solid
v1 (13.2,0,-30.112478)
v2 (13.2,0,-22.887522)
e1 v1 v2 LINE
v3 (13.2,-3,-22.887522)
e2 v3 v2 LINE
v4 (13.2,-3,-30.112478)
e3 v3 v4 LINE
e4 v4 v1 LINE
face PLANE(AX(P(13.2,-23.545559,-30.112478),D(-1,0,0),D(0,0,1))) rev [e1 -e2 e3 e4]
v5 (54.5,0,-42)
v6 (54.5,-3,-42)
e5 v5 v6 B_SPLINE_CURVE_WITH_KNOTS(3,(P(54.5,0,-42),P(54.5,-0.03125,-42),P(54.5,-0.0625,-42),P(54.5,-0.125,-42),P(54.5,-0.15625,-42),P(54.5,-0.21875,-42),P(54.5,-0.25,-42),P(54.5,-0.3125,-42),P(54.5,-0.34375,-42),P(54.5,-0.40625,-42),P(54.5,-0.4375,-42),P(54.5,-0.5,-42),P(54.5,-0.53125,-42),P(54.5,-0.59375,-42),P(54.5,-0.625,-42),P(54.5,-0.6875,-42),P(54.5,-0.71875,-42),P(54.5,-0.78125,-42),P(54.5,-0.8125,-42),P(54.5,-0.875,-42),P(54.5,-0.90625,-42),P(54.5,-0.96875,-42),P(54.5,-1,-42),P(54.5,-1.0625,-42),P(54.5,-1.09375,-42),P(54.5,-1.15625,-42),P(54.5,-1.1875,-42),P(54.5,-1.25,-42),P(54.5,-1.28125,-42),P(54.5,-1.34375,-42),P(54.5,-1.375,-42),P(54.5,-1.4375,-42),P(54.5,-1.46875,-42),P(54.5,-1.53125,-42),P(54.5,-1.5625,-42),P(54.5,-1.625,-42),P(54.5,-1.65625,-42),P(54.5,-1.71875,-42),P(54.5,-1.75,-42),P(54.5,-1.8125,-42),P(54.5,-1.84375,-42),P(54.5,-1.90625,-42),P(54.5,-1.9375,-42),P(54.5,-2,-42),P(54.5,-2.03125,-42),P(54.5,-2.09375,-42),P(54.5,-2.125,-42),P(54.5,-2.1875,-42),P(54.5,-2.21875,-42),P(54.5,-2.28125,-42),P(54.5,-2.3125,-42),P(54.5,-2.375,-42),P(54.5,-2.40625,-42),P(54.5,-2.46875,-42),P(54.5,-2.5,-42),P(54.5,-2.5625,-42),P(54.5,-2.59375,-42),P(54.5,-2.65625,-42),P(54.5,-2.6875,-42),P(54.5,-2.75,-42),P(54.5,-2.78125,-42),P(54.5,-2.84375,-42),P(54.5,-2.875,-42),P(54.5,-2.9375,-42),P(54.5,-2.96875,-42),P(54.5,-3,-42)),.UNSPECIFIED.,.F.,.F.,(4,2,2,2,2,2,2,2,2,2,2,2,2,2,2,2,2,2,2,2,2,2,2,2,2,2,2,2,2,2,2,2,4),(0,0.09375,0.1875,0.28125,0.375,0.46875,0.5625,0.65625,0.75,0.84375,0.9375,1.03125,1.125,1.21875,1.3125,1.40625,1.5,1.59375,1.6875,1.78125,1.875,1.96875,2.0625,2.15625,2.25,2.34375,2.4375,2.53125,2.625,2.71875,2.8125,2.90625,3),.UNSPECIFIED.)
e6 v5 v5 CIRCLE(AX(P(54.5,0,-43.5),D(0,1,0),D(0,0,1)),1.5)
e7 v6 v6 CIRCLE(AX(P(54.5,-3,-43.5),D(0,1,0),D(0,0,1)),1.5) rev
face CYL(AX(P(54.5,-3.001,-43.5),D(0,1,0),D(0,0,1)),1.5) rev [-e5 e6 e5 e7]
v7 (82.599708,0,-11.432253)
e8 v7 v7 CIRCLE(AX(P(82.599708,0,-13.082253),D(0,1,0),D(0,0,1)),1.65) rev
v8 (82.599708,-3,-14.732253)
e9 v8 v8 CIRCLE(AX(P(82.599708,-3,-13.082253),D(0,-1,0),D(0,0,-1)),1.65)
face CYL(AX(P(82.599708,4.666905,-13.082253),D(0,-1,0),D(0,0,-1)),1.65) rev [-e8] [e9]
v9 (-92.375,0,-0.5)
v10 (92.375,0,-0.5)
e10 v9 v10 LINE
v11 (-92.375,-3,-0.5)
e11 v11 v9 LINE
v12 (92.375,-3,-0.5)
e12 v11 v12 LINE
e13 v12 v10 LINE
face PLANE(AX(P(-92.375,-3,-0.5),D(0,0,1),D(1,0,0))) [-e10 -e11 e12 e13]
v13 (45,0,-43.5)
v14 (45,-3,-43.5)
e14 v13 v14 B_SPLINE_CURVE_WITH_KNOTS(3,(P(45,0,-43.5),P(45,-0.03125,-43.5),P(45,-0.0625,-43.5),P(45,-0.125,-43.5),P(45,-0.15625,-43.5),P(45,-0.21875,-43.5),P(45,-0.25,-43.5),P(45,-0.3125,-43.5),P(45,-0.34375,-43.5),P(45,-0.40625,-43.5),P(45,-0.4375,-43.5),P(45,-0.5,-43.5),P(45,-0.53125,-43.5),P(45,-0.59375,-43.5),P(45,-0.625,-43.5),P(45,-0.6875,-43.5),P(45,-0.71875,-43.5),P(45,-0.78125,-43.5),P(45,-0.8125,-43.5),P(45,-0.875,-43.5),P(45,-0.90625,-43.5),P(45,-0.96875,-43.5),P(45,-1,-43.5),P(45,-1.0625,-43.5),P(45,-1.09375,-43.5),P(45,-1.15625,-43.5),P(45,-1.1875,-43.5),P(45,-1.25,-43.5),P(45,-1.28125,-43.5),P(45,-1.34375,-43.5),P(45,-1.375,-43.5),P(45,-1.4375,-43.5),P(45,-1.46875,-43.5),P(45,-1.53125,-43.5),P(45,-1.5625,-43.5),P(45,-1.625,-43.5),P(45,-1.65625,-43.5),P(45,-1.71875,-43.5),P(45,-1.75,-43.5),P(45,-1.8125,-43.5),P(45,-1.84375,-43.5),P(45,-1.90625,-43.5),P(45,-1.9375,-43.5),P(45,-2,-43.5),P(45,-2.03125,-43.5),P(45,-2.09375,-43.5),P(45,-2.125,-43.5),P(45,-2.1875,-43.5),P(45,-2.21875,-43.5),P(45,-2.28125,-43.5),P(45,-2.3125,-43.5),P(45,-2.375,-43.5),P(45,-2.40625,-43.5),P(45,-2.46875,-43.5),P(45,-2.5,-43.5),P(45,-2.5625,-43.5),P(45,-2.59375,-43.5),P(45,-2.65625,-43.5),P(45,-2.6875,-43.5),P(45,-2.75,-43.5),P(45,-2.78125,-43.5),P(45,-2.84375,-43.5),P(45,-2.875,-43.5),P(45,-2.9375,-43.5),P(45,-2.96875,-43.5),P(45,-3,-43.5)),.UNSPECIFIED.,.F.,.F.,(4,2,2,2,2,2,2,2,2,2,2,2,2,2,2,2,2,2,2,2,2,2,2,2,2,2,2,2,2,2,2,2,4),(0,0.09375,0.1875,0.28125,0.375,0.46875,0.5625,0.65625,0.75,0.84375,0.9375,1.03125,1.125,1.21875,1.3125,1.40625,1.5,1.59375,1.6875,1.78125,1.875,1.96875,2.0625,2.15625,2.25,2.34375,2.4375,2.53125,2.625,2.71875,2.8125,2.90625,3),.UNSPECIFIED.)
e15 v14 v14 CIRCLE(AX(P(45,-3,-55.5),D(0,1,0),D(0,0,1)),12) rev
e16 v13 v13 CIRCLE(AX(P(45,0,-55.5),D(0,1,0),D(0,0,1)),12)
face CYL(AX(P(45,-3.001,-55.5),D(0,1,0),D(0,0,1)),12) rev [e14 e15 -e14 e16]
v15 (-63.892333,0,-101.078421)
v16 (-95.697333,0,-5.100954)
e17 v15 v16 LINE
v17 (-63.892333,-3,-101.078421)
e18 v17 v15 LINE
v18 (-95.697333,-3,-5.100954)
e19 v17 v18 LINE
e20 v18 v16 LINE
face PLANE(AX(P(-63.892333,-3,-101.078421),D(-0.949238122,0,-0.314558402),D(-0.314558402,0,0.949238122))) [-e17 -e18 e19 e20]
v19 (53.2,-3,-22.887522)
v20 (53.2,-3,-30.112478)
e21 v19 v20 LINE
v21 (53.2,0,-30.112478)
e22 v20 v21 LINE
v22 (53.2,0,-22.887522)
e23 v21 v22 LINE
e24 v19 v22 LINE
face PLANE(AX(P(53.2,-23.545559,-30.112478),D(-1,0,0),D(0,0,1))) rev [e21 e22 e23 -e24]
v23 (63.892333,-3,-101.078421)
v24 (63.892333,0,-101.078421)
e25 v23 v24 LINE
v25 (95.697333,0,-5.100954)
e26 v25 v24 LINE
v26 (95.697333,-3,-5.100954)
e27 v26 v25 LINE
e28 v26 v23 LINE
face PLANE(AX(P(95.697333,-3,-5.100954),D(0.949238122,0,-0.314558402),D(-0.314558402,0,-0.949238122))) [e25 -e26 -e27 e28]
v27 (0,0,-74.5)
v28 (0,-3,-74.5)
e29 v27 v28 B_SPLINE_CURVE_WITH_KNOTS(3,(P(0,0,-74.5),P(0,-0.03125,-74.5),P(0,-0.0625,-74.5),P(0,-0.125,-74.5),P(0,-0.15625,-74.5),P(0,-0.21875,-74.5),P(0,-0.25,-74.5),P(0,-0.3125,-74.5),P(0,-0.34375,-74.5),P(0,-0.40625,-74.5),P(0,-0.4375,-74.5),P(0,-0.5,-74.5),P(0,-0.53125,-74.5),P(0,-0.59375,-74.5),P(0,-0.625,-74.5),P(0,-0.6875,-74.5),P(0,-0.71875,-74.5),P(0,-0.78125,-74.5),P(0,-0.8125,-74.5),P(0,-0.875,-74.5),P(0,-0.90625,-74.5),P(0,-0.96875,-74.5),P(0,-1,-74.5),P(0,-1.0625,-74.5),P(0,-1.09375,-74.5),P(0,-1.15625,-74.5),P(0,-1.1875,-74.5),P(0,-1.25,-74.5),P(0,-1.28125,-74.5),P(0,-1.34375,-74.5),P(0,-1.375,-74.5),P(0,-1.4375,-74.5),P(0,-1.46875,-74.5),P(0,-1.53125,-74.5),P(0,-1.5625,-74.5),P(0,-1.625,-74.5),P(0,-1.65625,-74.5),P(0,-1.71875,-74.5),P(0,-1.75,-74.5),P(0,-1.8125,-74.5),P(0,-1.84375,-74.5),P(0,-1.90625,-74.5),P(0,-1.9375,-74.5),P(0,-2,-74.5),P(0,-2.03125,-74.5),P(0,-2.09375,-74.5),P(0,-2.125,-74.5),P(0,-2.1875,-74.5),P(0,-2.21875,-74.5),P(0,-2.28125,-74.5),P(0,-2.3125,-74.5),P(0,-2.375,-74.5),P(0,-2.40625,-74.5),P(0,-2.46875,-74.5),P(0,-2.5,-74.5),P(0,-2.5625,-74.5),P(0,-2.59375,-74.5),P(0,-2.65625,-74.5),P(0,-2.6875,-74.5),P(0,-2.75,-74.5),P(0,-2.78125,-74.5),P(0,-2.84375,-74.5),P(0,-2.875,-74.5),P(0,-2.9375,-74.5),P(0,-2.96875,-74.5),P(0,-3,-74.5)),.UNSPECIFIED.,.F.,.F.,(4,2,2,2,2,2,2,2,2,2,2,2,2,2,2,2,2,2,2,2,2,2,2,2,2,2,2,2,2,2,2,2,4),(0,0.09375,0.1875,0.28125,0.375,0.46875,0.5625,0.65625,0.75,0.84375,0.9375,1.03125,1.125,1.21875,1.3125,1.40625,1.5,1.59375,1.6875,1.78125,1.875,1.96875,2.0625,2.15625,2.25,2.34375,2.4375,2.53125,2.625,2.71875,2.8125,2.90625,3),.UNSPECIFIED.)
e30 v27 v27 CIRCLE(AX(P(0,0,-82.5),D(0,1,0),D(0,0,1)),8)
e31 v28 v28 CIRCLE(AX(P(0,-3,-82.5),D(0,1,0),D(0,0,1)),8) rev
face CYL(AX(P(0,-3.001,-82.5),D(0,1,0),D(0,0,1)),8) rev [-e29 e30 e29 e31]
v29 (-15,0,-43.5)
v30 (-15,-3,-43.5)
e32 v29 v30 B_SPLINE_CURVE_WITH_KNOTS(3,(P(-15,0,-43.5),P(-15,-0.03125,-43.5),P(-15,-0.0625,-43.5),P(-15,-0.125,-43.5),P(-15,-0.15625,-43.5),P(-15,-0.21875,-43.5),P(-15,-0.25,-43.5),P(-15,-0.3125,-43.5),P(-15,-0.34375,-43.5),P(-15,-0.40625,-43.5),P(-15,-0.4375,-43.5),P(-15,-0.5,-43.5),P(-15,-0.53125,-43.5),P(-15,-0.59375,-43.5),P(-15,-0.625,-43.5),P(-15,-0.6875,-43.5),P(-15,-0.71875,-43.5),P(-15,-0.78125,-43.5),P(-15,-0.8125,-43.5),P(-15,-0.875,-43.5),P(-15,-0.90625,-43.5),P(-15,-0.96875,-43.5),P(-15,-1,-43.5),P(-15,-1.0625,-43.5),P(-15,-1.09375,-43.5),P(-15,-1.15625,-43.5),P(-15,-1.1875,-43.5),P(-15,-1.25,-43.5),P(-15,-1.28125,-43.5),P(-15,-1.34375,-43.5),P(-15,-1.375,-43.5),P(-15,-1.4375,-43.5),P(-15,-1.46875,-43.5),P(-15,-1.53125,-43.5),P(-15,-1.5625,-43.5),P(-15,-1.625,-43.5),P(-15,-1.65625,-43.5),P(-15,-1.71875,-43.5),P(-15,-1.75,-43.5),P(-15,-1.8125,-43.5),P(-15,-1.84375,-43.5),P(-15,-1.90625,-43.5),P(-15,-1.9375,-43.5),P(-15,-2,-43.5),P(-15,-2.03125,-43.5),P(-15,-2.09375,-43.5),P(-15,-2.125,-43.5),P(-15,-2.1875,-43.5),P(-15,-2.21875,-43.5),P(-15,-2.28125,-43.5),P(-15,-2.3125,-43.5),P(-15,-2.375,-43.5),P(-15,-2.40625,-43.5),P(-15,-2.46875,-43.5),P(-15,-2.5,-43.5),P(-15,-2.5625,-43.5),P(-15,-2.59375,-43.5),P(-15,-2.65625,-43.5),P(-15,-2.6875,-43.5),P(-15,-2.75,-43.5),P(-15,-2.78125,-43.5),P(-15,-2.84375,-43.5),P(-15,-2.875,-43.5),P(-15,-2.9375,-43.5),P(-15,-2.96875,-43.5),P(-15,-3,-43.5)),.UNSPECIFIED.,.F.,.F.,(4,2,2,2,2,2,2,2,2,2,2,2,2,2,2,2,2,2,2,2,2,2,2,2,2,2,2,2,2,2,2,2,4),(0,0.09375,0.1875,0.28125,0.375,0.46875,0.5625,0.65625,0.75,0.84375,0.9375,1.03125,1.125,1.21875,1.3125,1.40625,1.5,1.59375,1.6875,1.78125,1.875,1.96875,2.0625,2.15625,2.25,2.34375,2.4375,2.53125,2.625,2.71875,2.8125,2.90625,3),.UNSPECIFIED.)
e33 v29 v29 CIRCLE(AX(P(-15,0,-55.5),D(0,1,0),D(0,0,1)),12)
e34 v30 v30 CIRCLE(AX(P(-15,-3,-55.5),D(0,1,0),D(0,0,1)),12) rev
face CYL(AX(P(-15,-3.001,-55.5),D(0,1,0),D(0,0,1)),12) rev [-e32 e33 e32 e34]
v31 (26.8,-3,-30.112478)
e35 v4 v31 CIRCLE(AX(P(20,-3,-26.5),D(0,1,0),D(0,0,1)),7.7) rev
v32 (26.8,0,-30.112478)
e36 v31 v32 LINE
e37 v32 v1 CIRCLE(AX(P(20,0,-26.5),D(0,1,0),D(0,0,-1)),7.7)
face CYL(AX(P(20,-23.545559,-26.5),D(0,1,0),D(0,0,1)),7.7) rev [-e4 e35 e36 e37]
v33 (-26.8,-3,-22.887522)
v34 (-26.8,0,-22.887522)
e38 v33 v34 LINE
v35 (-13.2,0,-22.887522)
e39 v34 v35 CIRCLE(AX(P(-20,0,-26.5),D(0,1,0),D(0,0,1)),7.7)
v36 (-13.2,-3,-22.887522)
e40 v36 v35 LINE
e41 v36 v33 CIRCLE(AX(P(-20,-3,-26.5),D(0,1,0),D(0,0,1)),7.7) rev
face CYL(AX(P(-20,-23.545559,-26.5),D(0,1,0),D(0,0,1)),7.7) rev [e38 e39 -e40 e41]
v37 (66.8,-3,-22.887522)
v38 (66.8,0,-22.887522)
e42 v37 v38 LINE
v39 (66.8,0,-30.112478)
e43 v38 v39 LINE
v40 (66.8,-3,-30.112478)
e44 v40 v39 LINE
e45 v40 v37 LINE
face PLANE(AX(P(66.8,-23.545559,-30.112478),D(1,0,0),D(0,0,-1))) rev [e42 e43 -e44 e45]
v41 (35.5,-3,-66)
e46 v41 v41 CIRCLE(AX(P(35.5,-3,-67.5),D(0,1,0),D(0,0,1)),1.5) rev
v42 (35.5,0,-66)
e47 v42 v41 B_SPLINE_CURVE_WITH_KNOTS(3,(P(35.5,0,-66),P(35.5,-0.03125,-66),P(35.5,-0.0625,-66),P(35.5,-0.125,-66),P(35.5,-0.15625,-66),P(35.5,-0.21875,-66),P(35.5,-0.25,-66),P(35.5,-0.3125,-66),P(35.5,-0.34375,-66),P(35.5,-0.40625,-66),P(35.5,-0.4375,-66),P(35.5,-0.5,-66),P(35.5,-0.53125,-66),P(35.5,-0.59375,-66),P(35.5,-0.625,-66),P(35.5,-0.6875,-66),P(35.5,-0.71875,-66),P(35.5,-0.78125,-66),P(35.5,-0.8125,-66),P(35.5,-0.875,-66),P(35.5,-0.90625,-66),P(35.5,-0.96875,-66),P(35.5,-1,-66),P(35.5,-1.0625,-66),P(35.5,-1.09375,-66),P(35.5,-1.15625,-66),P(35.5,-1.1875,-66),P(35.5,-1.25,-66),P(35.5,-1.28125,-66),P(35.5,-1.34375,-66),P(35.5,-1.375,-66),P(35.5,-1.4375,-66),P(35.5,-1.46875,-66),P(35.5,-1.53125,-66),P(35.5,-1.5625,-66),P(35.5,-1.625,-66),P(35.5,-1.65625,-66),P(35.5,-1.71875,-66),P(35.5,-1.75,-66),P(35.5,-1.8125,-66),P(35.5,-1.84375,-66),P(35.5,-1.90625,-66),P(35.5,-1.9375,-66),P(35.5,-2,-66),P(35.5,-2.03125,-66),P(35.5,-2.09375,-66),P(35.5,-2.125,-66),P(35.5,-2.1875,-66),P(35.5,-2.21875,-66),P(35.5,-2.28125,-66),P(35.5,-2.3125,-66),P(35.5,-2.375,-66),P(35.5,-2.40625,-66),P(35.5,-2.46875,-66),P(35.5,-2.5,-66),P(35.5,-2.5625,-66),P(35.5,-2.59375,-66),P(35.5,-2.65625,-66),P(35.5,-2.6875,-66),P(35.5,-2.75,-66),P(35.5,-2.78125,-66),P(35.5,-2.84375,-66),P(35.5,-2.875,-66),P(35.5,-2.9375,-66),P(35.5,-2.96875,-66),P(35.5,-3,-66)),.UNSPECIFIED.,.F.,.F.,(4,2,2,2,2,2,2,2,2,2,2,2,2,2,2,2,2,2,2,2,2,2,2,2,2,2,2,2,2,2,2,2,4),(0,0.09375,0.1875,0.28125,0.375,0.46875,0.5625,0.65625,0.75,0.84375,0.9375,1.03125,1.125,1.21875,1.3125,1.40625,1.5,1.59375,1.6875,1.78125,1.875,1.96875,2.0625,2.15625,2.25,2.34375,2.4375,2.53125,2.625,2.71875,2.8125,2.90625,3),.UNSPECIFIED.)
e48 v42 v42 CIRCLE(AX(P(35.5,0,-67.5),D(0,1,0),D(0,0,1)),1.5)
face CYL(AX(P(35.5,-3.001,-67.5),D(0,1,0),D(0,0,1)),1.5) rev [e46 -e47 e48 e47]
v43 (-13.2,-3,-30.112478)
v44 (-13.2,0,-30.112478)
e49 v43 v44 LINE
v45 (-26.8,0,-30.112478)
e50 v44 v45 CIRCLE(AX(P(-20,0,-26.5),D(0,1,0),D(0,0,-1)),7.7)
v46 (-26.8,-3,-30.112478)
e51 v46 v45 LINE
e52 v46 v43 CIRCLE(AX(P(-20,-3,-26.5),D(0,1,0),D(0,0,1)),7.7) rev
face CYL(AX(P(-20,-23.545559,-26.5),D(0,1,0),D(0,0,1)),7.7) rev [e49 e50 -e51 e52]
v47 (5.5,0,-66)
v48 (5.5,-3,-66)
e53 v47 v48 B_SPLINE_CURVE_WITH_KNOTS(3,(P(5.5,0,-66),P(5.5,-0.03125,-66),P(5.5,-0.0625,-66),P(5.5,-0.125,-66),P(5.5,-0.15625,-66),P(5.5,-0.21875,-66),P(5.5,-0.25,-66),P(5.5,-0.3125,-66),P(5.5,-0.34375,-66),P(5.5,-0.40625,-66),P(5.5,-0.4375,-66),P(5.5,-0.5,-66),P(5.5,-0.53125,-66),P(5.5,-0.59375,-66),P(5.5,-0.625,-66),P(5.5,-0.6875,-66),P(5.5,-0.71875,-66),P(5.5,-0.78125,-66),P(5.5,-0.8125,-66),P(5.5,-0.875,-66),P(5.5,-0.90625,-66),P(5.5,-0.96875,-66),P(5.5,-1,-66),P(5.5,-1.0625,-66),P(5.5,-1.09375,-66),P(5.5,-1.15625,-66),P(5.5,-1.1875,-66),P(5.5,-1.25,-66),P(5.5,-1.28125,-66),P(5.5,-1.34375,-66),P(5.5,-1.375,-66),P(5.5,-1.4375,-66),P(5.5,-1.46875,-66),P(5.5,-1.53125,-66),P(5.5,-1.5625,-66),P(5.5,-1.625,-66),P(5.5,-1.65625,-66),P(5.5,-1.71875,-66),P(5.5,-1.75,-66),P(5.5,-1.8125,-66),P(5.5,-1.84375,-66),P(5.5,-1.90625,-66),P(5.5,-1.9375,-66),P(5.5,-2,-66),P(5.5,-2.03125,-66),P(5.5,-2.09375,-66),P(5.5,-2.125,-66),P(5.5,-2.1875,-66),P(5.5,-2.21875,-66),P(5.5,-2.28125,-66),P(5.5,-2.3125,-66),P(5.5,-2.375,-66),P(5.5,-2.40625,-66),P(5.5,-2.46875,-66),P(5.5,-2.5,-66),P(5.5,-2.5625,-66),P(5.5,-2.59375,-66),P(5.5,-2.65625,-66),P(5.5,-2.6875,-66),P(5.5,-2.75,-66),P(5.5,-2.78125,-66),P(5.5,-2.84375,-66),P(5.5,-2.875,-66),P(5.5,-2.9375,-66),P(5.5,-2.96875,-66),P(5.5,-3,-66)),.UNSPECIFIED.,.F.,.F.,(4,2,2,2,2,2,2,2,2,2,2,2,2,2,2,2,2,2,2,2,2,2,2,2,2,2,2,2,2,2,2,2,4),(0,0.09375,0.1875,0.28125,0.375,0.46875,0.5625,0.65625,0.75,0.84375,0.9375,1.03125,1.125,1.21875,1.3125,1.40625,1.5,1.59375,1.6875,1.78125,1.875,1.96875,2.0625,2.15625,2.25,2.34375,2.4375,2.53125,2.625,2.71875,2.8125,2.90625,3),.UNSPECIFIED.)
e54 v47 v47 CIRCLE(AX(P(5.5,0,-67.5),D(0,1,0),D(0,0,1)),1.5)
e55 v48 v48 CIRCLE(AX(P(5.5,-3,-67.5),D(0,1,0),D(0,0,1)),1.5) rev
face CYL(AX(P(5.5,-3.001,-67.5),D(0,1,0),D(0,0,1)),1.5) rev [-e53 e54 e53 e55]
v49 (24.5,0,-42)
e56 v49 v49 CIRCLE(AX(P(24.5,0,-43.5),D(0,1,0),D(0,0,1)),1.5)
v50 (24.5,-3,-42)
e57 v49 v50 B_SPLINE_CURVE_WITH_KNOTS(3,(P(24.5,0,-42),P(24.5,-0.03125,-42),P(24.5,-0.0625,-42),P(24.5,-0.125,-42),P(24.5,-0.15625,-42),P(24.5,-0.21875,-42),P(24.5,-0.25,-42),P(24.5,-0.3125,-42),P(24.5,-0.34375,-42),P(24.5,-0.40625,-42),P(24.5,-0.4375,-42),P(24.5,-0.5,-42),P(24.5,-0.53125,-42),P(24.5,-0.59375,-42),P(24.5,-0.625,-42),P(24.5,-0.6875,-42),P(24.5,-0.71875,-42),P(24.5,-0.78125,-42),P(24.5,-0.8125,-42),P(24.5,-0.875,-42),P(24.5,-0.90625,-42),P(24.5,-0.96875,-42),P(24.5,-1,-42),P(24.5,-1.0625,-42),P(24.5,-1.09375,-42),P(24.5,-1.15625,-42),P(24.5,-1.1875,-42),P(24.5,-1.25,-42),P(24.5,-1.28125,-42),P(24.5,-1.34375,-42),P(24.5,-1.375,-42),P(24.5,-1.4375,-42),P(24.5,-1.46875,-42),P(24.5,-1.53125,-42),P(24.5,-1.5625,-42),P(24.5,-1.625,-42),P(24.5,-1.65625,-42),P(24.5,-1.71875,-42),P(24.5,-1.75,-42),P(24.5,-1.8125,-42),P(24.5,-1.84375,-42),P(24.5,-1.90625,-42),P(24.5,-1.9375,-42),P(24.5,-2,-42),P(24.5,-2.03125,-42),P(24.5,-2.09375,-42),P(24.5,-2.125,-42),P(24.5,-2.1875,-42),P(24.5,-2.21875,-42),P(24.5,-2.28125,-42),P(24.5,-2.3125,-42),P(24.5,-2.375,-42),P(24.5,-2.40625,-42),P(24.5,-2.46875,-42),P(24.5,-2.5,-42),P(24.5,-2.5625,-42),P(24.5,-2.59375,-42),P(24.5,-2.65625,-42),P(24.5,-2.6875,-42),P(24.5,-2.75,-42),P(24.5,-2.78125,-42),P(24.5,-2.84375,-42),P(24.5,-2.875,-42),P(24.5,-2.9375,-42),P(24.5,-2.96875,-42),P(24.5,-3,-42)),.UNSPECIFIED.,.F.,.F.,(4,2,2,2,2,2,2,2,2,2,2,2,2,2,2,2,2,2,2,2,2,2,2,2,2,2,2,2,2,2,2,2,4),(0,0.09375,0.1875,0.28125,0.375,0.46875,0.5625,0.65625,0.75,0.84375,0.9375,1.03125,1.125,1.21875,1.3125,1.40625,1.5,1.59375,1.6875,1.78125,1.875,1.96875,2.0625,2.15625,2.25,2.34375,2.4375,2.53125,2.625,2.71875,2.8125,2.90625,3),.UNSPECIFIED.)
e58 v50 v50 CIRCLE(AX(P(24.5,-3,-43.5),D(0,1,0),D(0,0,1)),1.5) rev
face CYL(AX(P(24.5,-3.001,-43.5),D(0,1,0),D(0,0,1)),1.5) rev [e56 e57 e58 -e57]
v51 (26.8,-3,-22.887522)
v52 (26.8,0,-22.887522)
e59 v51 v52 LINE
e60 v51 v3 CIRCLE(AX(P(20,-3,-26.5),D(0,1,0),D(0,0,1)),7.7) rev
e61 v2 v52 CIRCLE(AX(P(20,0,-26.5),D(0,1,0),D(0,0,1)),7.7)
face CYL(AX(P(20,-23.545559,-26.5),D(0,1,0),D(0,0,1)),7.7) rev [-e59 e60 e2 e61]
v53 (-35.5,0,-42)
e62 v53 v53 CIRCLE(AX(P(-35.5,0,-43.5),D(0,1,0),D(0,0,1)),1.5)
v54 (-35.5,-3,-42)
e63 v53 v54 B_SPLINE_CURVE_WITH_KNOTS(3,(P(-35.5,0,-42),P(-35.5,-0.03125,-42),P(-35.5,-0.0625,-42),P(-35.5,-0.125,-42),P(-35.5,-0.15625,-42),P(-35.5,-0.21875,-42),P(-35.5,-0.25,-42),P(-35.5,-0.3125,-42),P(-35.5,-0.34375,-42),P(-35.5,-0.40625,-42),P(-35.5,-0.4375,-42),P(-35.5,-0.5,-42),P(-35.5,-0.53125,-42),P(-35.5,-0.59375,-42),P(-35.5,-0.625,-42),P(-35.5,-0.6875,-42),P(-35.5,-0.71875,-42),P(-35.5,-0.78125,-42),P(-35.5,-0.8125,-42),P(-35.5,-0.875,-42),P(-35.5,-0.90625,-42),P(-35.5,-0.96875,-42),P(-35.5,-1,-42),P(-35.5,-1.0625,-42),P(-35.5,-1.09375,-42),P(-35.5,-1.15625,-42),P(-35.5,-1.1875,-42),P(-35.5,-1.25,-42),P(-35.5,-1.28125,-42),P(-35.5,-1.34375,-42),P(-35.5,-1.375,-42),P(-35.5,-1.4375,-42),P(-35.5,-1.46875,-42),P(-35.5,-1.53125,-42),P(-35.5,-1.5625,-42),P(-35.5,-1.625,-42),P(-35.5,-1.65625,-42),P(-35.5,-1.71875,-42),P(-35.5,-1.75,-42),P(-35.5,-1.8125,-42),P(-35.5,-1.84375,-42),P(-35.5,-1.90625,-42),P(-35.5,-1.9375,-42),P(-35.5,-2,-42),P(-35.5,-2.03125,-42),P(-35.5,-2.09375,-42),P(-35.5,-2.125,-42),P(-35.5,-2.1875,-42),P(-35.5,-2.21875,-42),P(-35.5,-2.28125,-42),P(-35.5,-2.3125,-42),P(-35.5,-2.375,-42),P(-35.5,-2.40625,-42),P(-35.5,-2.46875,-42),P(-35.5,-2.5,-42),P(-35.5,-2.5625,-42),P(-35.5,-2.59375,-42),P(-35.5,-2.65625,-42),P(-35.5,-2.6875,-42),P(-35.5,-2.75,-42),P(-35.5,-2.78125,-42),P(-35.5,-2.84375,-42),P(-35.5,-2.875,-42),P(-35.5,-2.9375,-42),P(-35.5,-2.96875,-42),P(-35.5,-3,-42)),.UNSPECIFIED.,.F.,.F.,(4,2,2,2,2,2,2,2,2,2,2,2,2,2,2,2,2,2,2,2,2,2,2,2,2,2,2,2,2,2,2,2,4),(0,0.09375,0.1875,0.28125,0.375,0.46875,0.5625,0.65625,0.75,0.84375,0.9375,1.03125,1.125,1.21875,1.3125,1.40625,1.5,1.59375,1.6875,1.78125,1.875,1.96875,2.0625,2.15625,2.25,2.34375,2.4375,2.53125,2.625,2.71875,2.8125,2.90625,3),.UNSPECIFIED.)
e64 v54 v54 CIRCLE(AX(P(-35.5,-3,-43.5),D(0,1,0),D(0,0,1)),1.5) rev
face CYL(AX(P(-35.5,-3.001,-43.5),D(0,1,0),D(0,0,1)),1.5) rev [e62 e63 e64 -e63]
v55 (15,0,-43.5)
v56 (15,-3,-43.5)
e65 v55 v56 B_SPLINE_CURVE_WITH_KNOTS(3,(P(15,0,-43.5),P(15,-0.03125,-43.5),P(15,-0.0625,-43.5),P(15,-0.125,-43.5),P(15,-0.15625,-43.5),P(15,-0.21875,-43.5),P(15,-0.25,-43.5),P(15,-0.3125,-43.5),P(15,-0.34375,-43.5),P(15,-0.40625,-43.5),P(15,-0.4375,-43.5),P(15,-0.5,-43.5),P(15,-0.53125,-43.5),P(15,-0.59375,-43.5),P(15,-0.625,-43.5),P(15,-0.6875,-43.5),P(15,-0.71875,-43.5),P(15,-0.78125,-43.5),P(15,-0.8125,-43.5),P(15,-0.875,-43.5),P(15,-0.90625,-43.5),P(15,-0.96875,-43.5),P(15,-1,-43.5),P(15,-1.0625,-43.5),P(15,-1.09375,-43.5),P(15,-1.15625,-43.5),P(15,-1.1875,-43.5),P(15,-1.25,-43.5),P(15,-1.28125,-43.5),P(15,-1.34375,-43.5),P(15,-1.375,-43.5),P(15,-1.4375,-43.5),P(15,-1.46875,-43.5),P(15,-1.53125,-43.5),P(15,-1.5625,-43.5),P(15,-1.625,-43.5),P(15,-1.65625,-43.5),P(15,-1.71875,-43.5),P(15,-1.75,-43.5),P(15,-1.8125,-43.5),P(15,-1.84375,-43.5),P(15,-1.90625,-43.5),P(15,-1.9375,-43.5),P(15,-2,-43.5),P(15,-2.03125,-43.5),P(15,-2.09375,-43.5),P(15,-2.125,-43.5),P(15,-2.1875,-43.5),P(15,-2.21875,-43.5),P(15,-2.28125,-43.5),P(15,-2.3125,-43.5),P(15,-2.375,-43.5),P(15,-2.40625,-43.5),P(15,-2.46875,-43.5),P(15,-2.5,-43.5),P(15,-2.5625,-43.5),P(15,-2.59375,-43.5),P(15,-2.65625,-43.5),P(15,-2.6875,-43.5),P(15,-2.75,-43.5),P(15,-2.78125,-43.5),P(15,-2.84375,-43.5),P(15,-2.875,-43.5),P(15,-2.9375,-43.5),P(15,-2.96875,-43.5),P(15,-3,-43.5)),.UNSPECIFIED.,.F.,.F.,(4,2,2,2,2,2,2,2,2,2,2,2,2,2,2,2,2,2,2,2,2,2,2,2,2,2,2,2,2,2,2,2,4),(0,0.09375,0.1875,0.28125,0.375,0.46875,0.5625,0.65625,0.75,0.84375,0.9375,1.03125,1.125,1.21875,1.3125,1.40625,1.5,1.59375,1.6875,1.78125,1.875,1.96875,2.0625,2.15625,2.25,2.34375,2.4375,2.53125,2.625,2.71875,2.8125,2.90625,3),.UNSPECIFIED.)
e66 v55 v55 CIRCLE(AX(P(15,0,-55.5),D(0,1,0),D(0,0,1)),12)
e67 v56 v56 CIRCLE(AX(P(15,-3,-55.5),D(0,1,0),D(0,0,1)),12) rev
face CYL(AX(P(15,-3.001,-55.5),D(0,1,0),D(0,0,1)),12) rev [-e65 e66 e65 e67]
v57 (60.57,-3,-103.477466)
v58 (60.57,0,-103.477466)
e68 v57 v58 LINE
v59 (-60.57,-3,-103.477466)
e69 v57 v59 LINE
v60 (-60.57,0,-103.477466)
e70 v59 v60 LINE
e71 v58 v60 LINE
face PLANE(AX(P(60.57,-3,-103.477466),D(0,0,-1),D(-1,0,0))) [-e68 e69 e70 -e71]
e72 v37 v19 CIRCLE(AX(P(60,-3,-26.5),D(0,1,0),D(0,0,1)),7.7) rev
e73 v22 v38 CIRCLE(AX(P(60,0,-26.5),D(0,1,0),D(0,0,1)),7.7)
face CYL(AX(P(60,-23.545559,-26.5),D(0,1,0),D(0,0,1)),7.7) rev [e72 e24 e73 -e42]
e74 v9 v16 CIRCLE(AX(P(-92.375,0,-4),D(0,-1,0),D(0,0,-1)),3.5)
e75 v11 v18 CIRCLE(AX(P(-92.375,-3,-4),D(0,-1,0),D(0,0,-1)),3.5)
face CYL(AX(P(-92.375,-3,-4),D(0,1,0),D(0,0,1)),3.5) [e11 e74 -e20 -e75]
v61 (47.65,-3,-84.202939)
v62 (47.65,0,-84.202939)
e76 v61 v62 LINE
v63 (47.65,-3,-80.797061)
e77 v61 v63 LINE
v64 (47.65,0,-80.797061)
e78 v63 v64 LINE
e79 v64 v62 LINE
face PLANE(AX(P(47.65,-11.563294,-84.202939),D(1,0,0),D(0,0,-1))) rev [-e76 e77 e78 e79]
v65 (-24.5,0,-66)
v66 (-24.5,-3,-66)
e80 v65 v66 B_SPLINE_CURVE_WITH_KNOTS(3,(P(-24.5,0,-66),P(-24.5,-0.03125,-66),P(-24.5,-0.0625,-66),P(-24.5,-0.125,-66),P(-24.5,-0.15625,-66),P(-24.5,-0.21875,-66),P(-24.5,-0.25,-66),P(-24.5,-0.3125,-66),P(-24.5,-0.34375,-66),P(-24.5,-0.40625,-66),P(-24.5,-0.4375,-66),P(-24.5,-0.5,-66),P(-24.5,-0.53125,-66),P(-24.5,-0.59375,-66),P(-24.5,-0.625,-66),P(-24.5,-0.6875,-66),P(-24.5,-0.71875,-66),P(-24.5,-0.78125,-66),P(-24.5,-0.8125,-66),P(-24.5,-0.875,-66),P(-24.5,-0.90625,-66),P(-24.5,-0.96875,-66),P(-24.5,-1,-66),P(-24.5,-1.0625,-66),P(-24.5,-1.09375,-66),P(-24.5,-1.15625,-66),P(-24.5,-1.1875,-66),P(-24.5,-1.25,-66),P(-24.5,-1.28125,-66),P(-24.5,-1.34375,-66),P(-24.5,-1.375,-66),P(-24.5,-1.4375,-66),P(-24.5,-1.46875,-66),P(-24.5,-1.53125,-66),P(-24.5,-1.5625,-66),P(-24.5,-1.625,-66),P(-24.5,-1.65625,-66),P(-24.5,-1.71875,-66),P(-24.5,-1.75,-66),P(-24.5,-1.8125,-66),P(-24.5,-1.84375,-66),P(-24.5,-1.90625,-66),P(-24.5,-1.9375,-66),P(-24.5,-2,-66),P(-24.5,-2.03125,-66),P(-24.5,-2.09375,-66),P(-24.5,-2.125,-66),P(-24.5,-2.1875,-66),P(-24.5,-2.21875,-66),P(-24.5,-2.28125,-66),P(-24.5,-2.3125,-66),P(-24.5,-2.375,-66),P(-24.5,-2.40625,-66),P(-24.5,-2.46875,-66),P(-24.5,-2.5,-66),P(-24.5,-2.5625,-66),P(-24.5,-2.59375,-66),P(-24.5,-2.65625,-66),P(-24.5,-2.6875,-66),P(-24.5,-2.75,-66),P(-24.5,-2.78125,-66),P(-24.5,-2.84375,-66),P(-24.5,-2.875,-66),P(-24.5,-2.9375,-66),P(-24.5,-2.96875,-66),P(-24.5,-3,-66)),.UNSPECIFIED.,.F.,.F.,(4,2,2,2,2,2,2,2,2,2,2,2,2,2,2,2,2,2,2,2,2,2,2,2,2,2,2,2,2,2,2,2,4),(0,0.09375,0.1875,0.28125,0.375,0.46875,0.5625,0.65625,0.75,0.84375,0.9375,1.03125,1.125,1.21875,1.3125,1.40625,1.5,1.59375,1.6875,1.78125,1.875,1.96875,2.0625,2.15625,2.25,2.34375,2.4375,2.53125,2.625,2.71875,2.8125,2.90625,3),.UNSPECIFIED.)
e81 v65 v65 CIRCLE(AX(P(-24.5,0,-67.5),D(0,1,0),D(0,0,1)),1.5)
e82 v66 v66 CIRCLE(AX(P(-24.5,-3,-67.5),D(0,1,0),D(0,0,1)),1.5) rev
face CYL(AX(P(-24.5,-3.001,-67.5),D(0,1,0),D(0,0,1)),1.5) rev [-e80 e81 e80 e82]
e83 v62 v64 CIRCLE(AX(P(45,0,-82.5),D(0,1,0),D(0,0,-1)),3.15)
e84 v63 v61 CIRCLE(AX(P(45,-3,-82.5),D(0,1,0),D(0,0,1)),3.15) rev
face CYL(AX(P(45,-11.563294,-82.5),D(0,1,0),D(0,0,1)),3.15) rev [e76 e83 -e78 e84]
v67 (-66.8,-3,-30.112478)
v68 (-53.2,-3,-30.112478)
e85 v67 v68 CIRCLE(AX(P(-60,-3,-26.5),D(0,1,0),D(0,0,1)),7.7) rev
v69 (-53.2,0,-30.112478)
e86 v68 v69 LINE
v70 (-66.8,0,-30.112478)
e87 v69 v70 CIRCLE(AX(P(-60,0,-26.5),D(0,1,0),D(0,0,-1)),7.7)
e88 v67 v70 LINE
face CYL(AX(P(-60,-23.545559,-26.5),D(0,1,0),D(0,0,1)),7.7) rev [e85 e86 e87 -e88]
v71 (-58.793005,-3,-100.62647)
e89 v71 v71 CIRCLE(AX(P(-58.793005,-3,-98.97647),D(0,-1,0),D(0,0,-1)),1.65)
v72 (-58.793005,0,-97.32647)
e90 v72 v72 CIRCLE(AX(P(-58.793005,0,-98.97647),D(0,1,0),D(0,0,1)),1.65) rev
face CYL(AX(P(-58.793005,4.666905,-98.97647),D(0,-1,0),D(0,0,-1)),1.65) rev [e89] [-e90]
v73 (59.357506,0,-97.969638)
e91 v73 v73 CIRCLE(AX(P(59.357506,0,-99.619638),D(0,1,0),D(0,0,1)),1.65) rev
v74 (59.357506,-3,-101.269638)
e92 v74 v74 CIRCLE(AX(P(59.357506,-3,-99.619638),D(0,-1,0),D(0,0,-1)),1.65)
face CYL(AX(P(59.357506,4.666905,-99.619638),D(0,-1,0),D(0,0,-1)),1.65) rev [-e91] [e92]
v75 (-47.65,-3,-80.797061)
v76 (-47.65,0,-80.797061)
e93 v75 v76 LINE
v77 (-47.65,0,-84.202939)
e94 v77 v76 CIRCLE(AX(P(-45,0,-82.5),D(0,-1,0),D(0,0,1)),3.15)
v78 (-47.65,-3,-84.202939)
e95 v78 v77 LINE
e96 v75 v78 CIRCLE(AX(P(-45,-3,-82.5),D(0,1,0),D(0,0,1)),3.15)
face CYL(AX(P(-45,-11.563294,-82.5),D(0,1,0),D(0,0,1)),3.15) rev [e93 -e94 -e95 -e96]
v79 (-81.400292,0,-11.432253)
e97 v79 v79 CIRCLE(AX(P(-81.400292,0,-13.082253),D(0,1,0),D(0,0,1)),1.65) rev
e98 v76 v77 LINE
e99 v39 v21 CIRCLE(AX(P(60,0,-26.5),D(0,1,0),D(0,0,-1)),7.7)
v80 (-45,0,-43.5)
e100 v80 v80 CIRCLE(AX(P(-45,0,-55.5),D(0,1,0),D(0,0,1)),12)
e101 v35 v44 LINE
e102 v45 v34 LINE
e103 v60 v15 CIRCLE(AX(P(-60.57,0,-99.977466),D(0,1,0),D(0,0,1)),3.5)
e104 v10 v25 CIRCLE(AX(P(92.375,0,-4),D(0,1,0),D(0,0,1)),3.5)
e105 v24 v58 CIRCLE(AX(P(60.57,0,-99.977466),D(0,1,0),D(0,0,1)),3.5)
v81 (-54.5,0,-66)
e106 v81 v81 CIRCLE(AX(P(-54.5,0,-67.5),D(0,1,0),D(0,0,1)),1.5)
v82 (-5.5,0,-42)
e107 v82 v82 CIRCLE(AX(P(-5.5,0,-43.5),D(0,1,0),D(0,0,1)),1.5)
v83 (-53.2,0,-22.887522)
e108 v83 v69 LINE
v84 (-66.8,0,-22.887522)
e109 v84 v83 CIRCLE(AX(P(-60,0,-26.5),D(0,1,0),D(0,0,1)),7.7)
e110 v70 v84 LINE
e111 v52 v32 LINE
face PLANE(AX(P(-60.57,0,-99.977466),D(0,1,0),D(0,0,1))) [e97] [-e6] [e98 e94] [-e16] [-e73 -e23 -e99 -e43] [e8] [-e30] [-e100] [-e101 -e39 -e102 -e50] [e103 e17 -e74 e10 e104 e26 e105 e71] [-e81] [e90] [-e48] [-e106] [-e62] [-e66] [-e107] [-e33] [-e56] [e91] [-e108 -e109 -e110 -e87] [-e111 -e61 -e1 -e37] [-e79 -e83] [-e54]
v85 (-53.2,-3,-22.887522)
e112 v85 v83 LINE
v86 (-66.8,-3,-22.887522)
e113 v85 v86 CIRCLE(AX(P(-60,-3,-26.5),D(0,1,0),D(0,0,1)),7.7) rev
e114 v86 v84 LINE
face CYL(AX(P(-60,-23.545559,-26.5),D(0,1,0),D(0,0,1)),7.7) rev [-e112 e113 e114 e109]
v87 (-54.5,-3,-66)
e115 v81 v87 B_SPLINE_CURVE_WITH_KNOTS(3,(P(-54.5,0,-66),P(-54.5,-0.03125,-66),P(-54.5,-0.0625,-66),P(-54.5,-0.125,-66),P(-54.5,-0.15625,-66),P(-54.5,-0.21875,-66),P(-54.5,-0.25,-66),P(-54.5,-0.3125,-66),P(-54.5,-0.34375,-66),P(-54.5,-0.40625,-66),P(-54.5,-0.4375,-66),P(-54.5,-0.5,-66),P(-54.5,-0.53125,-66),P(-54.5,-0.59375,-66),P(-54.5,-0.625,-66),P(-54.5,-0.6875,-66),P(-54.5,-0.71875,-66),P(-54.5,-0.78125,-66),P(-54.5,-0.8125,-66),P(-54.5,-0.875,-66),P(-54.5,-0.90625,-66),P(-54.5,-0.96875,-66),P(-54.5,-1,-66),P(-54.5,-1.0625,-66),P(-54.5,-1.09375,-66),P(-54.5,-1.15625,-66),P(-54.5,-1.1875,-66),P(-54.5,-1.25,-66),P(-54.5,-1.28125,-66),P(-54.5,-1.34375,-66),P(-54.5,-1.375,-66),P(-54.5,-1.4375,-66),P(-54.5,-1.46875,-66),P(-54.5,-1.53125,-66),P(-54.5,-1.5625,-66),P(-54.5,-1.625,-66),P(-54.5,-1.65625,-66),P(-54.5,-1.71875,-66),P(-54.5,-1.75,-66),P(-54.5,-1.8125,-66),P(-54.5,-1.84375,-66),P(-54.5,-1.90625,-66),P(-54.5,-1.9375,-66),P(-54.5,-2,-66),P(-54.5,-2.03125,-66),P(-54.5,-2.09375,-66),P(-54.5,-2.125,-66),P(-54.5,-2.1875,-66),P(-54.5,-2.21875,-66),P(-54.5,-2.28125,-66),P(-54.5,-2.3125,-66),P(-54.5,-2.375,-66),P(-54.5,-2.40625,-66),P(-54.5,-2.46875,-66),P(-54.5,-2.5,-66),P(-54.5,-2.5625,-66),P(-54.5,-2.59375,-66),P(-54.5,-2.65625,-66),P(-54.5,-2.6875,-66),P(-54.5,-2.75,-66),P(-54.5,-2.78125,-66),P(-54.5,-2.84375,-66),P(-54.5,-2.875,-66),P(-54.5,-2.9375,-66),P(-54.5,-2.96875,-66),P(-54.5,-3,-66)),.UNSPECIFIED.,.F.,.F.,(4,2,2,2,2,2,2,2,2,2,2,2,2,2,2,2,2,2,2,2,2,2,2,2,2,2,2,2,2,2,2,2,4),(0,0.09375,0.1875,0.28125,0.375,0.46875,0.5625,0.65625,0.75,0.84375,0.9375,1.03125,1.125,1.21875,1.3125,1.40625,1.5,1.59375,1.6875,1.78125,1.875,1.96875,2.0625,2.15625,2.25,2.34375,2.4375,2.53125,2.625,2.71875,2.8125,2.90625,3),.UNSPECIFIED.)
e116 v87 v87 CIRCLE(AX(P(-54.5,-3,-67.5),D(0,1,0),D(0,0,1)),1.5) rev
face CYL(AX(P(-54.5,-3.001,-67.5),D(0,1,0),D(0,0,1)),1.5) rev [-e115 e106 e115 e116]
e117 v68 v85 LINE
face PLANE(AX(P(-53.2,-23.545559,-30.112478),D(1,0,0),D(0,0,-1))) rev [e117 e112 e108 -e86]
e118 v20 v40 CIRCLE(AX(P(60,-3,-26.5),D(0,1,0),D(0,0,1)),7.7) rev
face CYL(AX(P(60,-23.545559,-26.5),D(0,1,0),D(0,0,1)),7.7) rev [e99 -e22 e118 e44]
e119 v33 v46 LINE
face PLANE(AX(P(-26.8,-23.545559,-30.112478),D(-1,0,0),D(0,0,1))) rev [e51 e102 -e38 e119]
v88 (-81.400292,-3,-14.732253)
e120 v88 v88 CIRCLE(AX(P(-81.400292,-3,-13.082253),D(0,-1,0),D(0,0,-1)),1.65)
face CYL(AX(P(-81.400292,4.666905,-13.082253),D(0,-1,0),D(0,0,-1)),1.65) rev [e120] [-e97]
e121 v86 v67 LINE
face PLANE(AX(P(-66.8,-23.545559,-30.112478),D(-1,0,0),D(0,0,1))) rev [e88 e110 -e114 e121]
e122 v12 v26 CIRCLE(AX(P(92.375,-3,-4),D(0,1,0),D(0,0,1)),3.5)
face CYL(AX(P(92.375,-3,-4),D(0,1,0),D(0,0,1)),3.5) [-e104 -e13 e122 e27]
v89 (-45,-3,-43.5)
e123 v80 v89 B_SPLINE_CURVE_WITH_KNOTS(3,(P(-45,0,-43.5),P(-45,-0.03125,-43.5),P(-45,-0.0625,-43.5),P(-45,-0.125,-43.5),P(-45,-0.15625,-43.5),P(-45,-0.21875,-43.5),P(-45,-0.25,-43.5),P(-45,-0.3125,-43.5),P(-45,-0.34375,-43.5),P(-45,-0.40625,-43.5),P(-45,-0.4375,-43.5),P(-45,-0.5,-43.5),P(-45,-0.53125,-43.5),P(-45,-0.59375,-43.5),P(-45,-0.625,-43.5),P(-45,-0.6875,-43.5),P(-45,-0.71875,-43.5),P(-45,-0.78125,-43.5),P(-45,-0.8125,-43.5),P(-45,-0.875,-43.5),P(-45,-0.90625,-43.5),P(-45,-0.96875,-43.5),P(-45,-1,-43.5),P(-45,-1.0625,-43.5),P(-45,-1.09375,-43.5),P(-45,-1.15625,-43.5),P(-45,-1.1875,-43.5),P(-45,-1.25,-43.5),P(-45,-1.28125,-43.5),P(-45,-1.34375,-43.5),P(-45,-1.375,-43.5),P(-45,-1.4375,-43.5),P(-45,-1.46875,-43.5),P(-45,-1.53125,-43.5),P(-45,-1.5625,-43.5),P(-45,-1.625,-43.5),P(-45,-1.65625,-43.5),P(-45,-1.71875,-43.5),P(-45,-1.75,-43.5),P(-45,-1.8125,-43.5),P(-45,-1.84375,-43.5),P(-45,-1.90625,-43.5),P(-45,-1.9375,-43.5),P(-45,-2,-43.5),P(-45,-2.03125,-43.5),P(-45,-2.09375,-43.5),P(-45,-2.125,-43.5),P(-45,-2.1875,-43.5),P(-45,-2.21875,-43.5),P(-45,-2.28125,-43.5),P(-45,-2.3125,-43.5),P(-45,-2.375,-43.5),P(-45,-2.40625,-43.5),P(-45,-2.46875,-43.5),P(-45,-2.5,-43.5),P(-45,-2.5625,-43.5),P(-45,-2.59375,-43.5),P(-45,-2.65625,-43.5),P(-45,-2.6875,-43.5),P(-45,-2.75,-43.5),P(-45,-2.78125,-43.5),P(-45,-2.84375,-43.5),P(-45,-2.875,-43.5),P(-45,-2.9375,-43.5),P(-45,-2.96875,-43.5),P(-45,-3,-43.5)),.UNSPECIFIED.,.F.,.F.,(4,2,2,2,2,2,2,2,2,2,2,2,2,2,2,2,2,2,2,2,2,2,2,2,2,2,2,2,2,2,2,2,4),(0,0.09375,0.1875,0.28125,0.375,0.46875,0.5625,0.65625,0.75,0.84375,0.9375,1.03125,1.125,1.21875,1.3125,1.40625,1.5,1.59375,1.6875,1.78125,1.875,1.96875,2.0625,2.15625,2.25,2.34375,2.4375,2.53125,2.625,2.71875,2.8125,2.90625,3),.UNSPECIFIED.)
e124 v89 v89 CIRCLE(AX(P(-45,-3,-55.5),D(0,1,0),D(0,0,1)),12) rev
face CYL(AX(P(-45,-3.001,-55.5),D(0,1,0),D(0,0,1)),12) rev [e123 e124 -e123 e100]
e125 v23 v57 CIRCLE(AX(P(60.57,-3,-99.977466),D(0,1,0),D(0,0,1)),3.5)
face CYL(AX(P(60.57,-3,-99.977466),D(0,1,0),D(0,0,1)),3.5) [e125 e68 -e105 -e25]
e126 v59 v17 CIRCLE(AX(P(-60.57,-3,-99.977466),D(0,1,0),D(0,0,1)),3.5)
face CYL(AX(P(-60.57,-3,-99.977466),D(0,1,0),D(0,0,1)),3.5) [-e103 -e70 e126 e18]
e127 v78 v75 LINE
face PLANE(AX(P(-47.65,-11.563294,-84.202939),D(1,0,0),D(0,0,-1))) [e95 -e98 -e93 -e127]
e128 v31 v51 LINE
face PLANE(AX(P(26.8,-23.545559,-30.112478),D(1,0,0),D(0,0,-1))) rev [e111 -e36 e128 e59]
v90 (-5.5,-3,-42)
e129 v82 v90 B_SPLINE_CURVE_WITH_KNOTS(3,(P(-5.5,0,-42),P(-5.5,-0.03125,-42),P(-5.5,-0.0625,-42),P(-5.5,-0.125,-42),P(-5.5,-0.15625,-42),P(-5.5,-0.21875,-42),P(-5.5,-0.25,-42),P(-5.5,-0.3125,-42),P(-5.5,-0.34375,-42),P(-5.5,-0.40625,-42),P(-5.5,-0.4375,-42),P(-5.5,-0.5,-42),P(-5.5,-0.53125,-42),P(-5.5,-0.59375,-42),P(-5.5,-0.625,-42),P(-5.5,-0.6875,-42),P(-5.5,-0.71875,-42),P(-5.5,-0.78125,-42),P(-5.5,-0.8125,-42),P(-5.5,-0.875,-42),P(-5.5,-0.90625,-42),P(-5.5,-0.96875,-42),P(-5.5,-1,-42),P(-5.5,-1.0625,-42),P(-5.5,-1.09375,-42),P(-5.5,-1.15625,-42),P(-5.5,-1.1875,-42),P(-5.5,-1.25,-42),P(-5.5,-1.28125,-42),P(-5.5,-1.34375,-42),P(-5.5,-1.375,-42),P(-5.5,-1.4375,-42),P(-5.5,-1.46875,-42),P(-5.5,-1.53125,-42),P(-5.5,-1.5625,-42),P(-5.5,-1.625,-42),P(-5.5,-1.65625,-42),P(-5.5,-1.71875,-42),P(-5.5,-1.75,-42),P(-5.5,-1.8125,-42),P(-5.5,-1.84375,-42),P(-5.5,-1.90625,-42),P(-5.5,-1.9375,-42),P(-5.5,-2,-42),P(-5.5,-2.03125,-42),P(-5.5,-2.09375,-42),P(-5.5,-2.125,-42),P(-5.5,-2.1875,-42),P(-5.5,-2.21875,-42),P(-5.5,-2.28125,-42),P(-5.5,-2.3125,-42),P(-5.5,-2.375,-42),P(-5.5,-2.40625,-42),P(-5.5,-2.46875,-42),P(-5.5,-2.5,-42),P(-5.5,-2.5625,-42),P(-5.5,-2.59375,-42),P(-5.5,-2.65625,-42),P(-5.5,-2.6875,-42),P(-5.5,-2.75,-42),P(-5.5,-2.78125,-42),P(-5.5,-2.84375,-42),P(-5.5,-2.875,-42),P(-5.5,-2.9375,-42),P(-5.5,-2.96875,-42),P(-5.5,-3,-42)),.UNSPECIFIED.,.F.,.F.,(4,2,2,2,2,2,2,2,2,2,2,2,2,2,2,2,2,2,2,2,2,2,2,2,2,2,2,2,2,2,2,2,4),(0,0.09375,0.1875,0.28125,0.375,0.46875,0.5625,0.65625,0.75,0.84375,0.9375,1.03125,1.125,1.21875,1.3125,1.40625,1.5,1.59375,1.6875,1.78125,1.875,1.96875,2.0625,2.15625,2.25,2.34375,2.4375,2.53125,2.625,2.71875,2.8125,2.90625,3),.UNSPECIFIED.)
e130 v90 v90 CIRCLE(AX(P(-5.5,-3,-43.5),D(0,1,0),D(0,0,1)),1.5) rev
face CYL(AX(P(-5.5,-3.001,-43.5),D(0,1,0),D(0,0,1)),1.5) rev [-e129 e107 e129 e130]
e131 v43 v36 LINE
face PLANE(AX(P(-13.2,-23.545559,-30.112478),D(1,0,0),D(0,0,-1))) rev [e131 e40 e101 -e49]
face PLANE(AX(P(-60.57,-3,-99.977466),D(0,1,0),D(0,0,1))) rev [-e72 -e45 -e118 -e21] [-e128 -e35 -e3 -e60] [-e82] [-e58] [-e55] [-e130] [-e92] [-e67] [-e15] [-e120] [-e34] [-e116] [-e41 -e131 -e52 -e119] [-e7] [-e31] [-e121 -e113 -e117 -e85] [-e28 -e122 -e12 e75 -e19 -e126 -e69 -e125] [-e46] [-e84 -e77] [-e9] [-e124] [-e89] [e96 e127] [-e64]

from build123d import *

# Parameters (mm, degrees)
BASE_FLANGE1_DEPTH  = 3
CUT_EXTRUDE3_REACH  = 143.098
SKETCH23_R          = 12
SKETCH23_R_2        = 1.5
CUT_EXTRUDE5_REACH  = 143.098
SKETCH25_R          = 8
SKETCH30_R          = 1.65
CUT_EXTRUDE7_DEPTH  = 3
CUT_EXTRUDE9_DEPTH  = 3
CUT_EXTRUDE10_DEPTH = 3


# Sheet-metal steps are written as plain solids
with BuildPart() as part:
    # Sketch1 → Base-Flange1 (new body)
    with BuildSketch(Plane(origin=(0, 0, 0), x_dir=(1, 0, 0), z_dir=(0, 1, 0))):
        with BuildLine():
            Line((-63.892333426, 101.078420902), (-95.697333426, 5.100954406))
            ThreePointArc((-95.697333426, 5.100954406), (-95.212546513, 1.951017377), (-92.375, 0.5))
            Line((-92.375, 0.5), (92.375, 0.5))
            ThreePointArc((92.375, 0.5), (95.212546513, 1.951017377), (95.697333426, 5.100954406))
            Line((95.697333426, 5.100954406), (63.892333426, 101.078420902))
            ThreePointArc((63.892333426, 101.078420902), (62.618982623, 102.815013009), (60.57, 103.477466496))
            Line((60.57, 103.477466496), (-60.57, 103.477466496))
            ThreePointArc((-60.57, 103.477466496), (-62.618982623, 102.815013009), (-63.892333426, 101.078420902))
        make_face()
    extrude(amount=-BASE_FLANGE1_DEPTH)

    # Sketch23 → Cut-Extrude3 (cut, up to next)
    with BuildSketch(Plane(origin=(0, 0, 0), x_dir=(1, 0, 0), z_dir=(0, 1, 0)), mode=Mode.PRIVATE) as cut_extrude3_sk1:
        with Locations(Location((-45, 55.5, 0), (0, 0, 270))):
            Circle(SKETCH23_R)
    cut_extrude3_tool1 = extrude(cut_extrude3_sk1.sketch, amount=-CUT_EXTRUDE3_REACH, mode=Mode.PRIVATE) & part.part
    # Sketch23 → Cut-Extrude3 (cut, up to next)
    with BuildSketch(Plane(origin=(0, 0, 0), x_dir=(1, 0, 0), z_dir=(0, 1, 0)), mode=Mode.PRIVATE) as cut_extrude3_sk2:
        with Locations(Location((-15, 55.5, 0), (0, 0, 270))):
            Circle(SKETCH23_R)
    cut_extrude3_tool2 = extrude(cut_extrude3_sk2.sketch, amount=-CUT_EXTRUDE3_REACH, mode=Mode.PRIVATE) & part.part
    # Sketch23 → Cut-Extrude3 (cut, up to next)
    with BuildSketch(Plane(origin=(0, 0, 0), x_dir=(1, 0, 0), z_dir=(0, 1, 0)), mode=Mode.PRIVATE) as cut_extrude3_sk3:
        with Locations(Location((15, 55.5, 0), (0, 0, 270))):
            Circle(SKETCH23_R)
    cut_extrude3_tool3 = extrude(cut_extrude3_sk3.sketch, amount=-CUT_EXTRUDE3_REACH, mode=Mode.PRIVATE) & part.part
    # Sketch23 → Cut-Extrude3 (cut, up to next)
    with BuildSketch(Plane(origin=(0, 0, 0), x_dir=(1, 0, 0), z_dir=(0, 1, 0)), mode=Mode.PRIVATE) as cut_extrude3_sk4:
        with Locations(Location((45, 55.5, 0), (0, 0, 270))):
            Circle(SKETCH23_R)
    cut_extrude3_tool4 = extrude(cut_extrude3_sk4.sketch, amount=-CUT_EXTRUDE3_REACH, mode=Mode.PRIVATE) & part.part
    # Sketch23 → Cut-Extrude3 (cut, up to next)
    with BuildSketch(Plane(origin=(0, 0, 0), x_dir=(1, 0, 0), z_dir=(0, 1, 0)), mode=Mode.PRIVATE) as cut_extrude3_sk5:
        with Locations(Location((-54.5, 67.5, 0), (0, 0, 270))):
            Circle(SKETCH23_R_2)
    cut_extrude3_tool5 = extrude(cut_extrude3_sk5.sketch, amount=-CUT_EXTRUDE3_REACH, mode=Mode.PRIVATE) & part.part
    # Sketch23 → Cut-Extrude3 (cut, up to next)
    with BuildSketch(Plane(origin=(0, 0, 0), x_dir=(1, 0, 0), z_dir=(0, 1, 0)), mode=Mode.PRIVATE) as cut_extrude3_sk6:
        with Locations(Location((-35.5, 43.5, 0), (0, 0, 270))):
            Circle(SKETCH23_R_2)
    cut_extrude3_tool6 = extrude(cut_extrude3_sk6.sketch, amount=-CUT_EXTRUDE3_REACH, mode=Mode.PRIVATE) & part.part
    # Sketch23 → Cut-Extrude3 (cut, up to next)
    with BuildSketch(Plane(origin=(0, 0, 0), x_dir=(1, 0, 0), z_dir=(0, 1, 0)), mode=Mode.PRIVATE) as cut_extrude3_sk7:
        with Locations(Location((-24.5, 67.5, 0), (0, 0, 270))):
            Circle(SKETCH23_R_2)
    cut_extrude3_tool7 = extrude(cut_extrude3_sk7.sketch, amount=-CUT_EXTRUDE3_REACH, mode=Mode.PRIVATE) & part.part
    # Sketch23 → Cut-Extrude3 (cut, up to next)
    with BuildSketch(Plane(origin=(0, 0, 0), x_dir=(1, 0, 0), z_dir=(0, 1, 0)), mode=Mode.PRIVATE) as cut_extrude3_sk8:
        with Locations(Location((-5.5, 43.5, 0), (0, 0, 270))):
            Circle(SKETCH23_R_2)
    cut_extrude3_tool8 = extrude(cut_extrude3_sk8.sketch, amount=-CUT_EXTRUDE3_REACH, mode=Mode.PRIVATE) & part.part
    # Sketch23 → Cut-Extrude3 (cut, up to next)
    with BuildSketch(Plane(origin=(0, 0, 0), x_dir=(1, 0, 0), z_dir=(0, 1, 0)), mode=Mode.PRIVATE) as cut_extrude3_sk9:
        with Locations(Location((5.5, 67.5, 0), (0, 0, 270))):
            Circle(SKETCH23_R_2)
    cut_extrude3_tool9 = extrude(cut_extrude3_sk9.sketch, amount=-CUT_EXTRUDE3_REACH, mode=Mode.PRIVATE) & part.part
    # Sketch23 → Cut-Extrude3 (cut, up to next)
    with BuildSketch(Plane(origin=(0, 0, 0), x_dir=(1, 0, 0), z_dir=(0, 1, 0)), mode=Mode.PRIVATE) as cut_extrude3_sk10:
        with Locations(Location((24.5, 43.5, 0), (0, 0, 270))):
            Circle(SKETCH23_R_2)
    cut_extrude3_tool10 = extrude(cut_extrude3_sk10.sketch, amount=-CUT_EXTRUDE3_REACH, mode=Mode.PRIVATE) & part.part
    # Sketch23 → Cut-Extrude3 (cut, up to next)
    with BuildSketch(Plane(origin=(0, 0, 0), x_dir=(1, 0, 0), z_dir=(0, 1, 0)), mode=Mode.PRIVATE) as cut_extrude3_sk11:
        with Locations(Location((35.5, 67.5, 0), (0, 0, 270))):
            Circle(SKETCH23_R_2)
    cut_extrude3_tool11 = extrude(cut_extrude3_sk11.sketch, amount=-CUT_EXTRUDE3_REACH, mode=Mode.PRIVATE) & part.part
    # Sketch23 → Cut-Extrude3 (cut, up to next)
    with BuildSketch(Plane(origin=(0, 0, 0), x_dir=(1, 0, 0), z_dir=(0, 1, 0)), mode=Mode.PRIVATE) as cut_extrude3_sk12:
        with Locations(Location((54.5, 43.5, 0), (0, 0, 270))):
            Circle(SKETCH23_R_2)
    cut_extrude3_tool12 = extrude(cut_extrude3_sk12.sketch, amount=-CUT_EXTRUDE3_REACH, mode=Mode.PRIVATE) & part.part
    add(cut_extrude3_tool1.solids().sort_by_distance((-45, 0, -55.5))[0], mode=Mode.SUBTRACT)
    add(cut_extrude3_tool2.solids().sort_by_distance((-15, 0, -55.5))[0], mode=Mode.SUBTRACT)
    add(cut_extrude3_tool3.solids().sort_by_distance((15, 0, -55.5))[0], mode=Mode.SUBTRACT)
    add(cut_extrude3_tool4.solids().sort_by_distance((45, 0, -55.5))[0], mode=Mode.SUBTRACT)
    add(cut_extrude3_tool5.solids().sort_by_distance((-54.5, 0, -67.5))[0], mode=Mode.SUBTRACT)
    add(cut_extrude3_tool6.solids().sort_by_distance((-35.5, 0, -43.5))[0], mode=Mode.SUBTRACT)
    add(cut_extrude3_tool7.solids().sort_by_distance((-24.5, 0, -67.5))[0], mode=Mode.SUBTRACT)
    add(cut_extrude3_tool8.solids().sort_by_distance((-5.5, 0, -43.5))[0], mode=Mode.SUBTRACT)
    add(cut_extrude3_tool9.solids().sort_by_distance((5.5, 0, -67.5))[0], mode=Mode.SUBTRACT)
    add(cut_extrude3_tool10.solids().sort_by_distance((24.5, 0, -43.5))[0], mode=Mode.SUBTRACT)
    add(cut_extrude3_tool11.solids().sort_by_distance((35.5, 0, -67.5))[0], mode=Mode.SUBTRACT)
    add(cut_extrude3_tool12.solids().sort_by_distance((54.5, 0, -43.5))[0], mode=Mode.SUBTRACT)

    # Sketch25 → Cut-Extrude5 (cut, up to next)
    with BuildSketch(Plane(origin=(0, 0, 0), x_dir=(1, 0, 0), z_dir=(0, 1, 0)), mode=Mode.PRIVATE) as cut_extrude5_sk1:
        with Locations(Location((0, 82.5, 0), (0, 0, 270))):
            Circle(SKETCH25_R)
    cut_extrude5_tool1 = extrude(cut_extrude5_sk1.sketch, amount=-CUT_EXTRUDE5_REACH, mode=Mode.PRIVATE) & part.part
    add(cut_extrude5_tool1.solids().sort_by_distance((0, 0, -82.5))[0], mode=Mode.SUBTRACT)

    # Sketch30 → Cut-Extrude7 (cut)
    with BuildSketch(Plane.XZ.offset(3)):
        with Locations(Location((-81.400291533, -13.08225267, 0), (0, 0, 270))):
            Circle(SKETCH30_R)
        with Locations(Location((82.599708467, -13.08225267, 0), (0, 0, 270))):
            Circle(SKETCH30_R)
        with Locations(Location((-58.793005262, -98.97646978, 0), (0, 0, 270))):
            Circle(SKETCH30_R)
        with Locations(Location((59.357506456, -99.619637978, 0), (0, 0, 270))):
            Circle(SKETCH30_R)
    extrude(amount=-CUT_EXTRUDE7_DEPTH, mode=Mode.SUBTRACT)

    # Sketch32 → Cut-Extrude9 (cut)
    with BuildSketch(Plane(origin=(0, 0, 0), x_dir=(1, 0, 0), z_dir=(0, 1, 0))):
        with BuildLine():
            Line((-66.8, 30.112478374), (-66.8, 22.887521626))
            ThreePointArc((-66.8, 22.887521626), (-60, 18.8), (-53.2, 22.887521626))
            Line((-53.2, 22.887521626), (-53.2, 30.112478374))
            ThreePointArc((-53.2, 30.112478374), (-60, 34.2), (-66.8, 30.112478374))
        make_face()
        with BuildLine():
            Line((-13.2, 30.112478374), (-13.2, 22.887521626))
            ThreePointArc((-13.2, 22.887521626), (-20, 18.8), (-26.8, 22.887521626))
            Line((-26.8, 22.887521626), (-26.8, 30.112478374))
            ThreePointArc((-26.8, 30.112478374), (-20, 34.2), (-13.2, 30.112478374))
        make_face()
        with BuildLine():
            Line((26.8, 30.112478374), (26.8, 22.887521626))
            ThreePointArc((26.8, 22.887521626), (20, 18.8), (13.2, 22.887521626))
            Line((13.2, 22.887521626), (13.2, 30.112478374))
            ThreePointArc((13.2, 30.112478374), (20, 34.2), (26.8, 30.112478374))
        make_face()
        with BuildLine():
            Line((66.8, 30.112478374), (66.8, 22.887521626))
            ThreePointArc((66.8, 22.887521626), (60, 18.8), (53.2, 22.887521626))
            Line((53.2, 22.887521626), (53.2, 30.112478374))
            ThreePointArc((53.2, 30.112478374), (60, 34.2), (66.8, 30.112478374))
        make_face()
    extrude(amount=-CUT_EXTRUDE9_DEPTH, mode=Mode.SUBTRACT)

    # Sketch33 → Cut-Extrude10 (cut)
    with BuildSketch(Plane(origin=(0, 0, 0), x_dir=(1, 0, 0), z_dir=(0, 1, 0))):
        with BuildLine():
            Line((47.65, 84.202938637), (47.65, 80.797061363))
            ThreePointArc((47.65, 80.797061363), (45, 79.35), (42.35, 80.797061363))
            ThreePointArc((42.35, 80.797061363), (41.85, 82.5), (42.35, 84.202938637))
            ThreePointArc((42.35, 84.202938637), (45, 85.65), (47.65, 84.202938637))
        make_face()
    cut_extrude10 = extrude(amount=-CUT_EXTRUDE10_DEPTH, mode=Mode.SUBTRACT)

    # Mirror1: Cut-Extrude10 across plane
    add(cut_extrude10.mirror(Plane(origin=(0, 0, 0), x_dir=(0, 0, 1), z_dir=(1, 0, 0))), mode=Mode.SUBTRACT)


solid = part.part
